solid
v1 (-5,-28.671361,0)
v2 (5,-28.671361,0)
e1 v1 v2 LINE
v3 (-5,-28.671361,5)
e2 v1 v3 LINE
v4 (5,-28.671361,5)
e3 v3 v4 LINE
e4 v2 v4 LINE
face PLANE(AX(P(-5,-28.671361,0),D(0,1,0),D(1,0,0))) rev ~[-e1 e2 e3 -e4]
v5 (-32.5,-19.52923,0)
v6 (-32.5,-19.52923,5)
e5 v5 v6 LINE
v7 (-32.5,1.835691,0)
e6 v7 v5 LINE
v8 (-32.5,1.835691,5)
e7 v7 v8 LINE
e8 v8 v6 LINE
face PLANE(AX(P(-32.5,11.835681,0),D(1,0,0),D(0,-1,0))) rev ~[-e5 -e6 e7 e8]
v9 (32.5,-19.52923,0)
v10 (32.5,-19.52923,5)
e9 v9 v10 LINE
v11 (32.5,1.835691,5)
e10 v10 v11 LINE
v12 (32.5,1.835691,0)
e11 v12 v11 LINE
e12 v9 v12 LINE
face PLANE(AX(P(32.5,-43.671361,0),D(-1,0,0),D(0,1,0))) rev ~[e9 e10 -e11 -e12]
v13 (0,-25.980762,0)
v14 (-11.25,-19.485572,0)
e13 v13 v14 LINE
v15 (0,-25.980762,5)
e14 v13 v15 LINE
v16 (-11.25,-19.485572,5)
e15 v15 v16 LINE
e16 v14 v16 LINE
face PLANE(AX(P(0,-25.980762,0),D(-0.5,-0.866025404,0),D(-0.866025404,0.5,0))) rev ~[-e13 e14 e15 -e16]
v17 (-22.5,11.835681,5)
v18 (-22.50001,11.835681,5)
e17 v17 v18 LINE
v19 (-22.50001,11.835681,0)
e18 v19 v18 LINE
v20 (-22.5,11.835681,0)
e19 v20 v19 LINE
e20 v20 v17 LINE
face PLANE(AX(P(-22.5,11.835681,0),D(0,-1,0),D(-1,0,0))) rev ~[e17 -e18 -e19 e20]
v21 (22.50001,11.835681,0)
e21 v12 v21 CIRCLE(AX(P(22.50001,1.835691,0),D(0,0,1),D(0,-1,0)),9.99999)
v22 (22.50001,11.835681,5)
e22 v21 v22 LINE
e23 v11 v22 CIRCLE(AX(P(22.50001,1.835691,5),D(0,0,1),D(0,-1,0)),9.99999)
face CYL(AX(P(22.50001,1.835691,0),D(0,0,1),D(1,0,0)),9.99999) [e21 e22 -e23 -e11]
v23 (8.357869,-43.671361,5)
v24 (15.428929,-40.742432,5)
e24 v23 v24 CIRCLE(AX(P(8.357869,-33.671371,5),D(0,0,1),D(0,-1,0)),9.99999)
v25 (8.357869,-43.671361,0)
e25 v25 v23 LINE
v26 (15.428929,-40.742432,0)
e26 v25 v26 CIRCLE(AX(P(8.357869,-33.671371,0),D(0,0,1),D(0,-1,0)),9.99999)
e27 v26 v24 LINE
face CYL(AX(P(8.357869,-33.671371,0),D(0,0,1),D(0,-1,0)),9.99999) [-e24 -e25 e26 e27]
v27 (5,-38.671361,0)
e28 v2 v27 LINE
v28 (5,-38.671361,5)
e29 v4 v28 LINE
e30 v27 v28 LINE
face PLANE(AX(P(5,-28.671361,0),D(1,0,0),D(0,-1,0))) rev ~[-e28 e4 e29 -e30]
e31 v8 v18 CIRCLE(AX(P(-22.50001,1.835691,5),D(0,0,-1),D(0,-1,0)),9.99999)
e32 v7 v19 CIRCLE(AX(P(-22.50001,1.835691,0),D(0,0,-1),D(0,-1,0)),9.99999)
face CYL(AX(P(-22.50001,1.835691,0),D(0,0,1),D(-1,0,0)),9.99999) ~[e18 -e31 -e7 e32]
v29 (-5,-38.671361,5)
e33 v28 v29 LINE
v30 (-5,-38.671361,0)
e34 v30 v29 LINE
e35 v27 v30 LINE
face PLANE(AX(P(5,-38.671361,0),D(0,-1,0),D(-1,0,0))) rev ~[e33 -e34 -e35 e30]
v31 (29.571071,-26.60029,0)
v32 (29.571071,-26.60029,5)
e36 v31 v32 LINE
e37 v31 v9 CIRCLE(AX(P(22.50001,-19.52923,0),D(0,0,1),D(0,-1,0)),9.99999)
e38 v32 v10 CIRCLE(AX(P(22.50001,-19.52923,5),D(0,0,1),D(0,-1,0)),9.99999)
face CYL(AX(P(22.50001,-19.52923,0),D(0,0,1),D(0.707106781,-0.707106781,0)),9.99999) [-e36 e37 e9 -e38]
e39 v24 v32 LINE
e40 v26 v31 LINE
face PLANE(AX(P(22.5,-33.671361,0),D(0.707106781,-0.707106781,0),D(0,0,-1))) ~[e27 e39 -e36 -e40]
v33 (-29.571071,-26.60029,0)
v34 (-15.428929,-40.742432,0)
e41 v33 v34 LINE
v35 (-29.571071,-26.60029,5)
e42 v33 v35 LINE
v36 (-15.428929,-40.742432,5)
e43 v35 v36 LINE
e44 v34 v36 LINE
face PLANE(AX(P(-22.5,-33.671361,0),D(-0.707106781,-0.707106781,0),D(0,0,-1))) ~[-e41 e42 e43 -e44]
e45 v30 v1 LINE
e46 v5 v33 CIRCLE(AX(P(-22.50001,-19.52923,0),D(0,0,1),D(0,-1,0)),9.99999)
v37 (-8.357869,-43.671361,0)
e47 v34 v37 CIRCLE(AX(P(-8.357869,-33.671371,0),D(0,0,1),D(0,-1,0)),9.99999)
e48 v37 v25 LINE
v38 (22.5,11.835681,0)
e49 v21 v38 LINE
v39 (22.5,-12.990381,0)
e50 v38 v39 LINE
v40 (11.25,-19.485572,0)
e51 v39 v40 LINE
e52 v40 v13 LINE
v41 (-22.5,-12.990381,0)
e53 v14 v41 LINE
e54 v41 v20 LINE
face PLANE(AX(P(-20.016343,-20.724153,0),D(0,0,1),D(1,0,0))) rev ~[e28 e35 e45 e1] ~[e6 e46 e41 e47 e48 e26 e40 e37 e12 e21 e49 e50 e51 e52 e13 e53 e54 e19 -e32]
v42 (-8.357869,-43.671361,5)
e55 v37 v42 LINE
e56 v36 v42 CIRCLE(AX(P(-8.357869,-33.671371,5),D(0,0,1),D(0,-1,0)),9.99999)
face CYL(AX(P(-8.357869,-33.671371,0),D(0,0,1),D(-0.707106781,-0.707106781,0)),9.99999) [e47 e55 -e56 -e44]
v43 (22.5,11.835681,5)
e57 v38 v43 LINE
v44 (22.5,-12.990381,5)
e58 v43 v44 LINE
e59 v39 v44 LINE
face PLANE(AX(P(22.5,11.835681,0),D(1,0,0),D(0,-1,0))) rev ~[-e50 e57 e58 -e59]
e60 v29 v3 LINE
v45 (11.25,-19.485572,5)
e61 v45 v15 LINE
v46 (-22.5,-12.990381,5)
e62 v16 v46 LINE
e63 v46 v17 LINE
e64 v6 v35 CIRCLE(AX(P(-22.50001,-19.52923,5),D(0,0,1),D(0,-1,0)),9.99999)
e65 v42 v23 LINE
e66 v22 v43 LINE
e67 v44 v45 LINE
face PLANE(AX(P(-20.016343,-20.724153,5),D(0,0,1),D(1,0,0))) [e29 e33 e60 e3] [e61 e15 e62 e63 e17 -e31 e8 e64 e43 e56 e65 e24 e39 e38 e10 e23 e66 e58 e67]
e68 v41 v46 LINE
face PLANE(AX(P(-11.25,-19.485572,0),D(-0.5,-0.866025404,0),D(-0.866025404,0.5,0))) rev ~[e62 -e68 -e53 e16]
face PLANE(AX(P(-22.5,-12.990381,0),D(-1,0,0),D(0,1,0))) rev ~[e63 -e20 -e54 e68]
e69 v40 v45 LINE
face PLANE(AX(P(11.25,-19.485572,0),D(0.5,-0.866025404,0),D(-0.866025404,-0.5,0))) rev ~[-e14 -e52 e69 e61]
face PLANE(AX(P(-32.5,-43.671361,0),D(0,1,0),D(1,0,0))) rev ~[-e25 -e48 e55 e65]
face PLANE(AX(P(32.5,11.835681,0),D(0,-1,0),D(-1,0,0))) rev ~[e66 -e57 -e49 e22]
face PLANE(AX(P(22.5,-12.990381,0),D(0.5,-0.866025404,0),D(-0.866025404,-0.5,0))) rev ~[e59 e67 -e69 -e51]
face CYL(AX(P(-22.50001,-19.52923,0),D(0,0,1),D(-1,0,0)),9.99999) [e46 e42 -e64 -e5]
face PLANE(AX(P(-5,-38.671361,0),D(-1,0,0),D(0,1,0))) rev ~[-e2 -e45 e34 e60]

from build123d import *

# Parameters (mm, degrees)
F1_DEPTH = 5
F2_SIZE  = 20
F3_R     = 9.99999


# Not quite as in the source:
# - a fillet or chamfer is up to 0.001 mm smaller than in the source, because OpenCascade refuses the exact size
# - a feature names something its author has since deleted; it is built from what else it names


with BuildPart() as f1:
    # F0 (on Top) → F1 (new body)
    with BuildSketch(Plane.XY):
        Polygon((0, -28.6713610368), (0, -25.9807621135), (-11.250000041, -19.4855715615), (-22.5, -12.9903810568), (-22.5, 0), (-22.5, 11.8356805184), (-32.5, 11.8356805184), (-32.5, -43.6713610368), (0, -43.6713610368), (0, -38.6713610368), (-5, -38.6713610368), (-5, -28.6713610368), align=None)
        Polygon((11.2499998166, -19.485571691), (0, -25.9807621135), (0, -28.6713610368), (5, -28.6713610368), (5, -38.6713610368), (0, -38.6713610368), (0, -43.6713610368), (32.5, -43.6713610368), (32.5, 11.8356805184), (22.5, 11.8356805184), (22.5, 0), (22.5, -12.9903810568), align=None)
    extrude(amount=F1_DEPTH)

    # F2
    f2_edges = [f1.edges().sort_by_distance(p)[0] for p in [
        (-32.5, -43.671361, 2.5),
        (32.5, -43.671361, 2.5),
    ]]
    chamfer(f2_edges, length=F2_SIZE)

    # F3 (radius 10 in the source; OpenCascade refuses exactly that, so slightly less here)
    f3_edges = [f1.edges().sort_by_distance(p)[0] for p in [
        (-32.5, 11.835681, 2.5),
        (32.5, -23.671361, 2.5),
        (32.5, 11.835681, 2.5),
        (12.5, -43.671361, 2.5),
        (-12.5, -43.671361, 2.5),
        (-32.5, -23.671361, 2.5),
    ]]
    fillet(f3_edges, radius=F3_R)


solid = f1.part
